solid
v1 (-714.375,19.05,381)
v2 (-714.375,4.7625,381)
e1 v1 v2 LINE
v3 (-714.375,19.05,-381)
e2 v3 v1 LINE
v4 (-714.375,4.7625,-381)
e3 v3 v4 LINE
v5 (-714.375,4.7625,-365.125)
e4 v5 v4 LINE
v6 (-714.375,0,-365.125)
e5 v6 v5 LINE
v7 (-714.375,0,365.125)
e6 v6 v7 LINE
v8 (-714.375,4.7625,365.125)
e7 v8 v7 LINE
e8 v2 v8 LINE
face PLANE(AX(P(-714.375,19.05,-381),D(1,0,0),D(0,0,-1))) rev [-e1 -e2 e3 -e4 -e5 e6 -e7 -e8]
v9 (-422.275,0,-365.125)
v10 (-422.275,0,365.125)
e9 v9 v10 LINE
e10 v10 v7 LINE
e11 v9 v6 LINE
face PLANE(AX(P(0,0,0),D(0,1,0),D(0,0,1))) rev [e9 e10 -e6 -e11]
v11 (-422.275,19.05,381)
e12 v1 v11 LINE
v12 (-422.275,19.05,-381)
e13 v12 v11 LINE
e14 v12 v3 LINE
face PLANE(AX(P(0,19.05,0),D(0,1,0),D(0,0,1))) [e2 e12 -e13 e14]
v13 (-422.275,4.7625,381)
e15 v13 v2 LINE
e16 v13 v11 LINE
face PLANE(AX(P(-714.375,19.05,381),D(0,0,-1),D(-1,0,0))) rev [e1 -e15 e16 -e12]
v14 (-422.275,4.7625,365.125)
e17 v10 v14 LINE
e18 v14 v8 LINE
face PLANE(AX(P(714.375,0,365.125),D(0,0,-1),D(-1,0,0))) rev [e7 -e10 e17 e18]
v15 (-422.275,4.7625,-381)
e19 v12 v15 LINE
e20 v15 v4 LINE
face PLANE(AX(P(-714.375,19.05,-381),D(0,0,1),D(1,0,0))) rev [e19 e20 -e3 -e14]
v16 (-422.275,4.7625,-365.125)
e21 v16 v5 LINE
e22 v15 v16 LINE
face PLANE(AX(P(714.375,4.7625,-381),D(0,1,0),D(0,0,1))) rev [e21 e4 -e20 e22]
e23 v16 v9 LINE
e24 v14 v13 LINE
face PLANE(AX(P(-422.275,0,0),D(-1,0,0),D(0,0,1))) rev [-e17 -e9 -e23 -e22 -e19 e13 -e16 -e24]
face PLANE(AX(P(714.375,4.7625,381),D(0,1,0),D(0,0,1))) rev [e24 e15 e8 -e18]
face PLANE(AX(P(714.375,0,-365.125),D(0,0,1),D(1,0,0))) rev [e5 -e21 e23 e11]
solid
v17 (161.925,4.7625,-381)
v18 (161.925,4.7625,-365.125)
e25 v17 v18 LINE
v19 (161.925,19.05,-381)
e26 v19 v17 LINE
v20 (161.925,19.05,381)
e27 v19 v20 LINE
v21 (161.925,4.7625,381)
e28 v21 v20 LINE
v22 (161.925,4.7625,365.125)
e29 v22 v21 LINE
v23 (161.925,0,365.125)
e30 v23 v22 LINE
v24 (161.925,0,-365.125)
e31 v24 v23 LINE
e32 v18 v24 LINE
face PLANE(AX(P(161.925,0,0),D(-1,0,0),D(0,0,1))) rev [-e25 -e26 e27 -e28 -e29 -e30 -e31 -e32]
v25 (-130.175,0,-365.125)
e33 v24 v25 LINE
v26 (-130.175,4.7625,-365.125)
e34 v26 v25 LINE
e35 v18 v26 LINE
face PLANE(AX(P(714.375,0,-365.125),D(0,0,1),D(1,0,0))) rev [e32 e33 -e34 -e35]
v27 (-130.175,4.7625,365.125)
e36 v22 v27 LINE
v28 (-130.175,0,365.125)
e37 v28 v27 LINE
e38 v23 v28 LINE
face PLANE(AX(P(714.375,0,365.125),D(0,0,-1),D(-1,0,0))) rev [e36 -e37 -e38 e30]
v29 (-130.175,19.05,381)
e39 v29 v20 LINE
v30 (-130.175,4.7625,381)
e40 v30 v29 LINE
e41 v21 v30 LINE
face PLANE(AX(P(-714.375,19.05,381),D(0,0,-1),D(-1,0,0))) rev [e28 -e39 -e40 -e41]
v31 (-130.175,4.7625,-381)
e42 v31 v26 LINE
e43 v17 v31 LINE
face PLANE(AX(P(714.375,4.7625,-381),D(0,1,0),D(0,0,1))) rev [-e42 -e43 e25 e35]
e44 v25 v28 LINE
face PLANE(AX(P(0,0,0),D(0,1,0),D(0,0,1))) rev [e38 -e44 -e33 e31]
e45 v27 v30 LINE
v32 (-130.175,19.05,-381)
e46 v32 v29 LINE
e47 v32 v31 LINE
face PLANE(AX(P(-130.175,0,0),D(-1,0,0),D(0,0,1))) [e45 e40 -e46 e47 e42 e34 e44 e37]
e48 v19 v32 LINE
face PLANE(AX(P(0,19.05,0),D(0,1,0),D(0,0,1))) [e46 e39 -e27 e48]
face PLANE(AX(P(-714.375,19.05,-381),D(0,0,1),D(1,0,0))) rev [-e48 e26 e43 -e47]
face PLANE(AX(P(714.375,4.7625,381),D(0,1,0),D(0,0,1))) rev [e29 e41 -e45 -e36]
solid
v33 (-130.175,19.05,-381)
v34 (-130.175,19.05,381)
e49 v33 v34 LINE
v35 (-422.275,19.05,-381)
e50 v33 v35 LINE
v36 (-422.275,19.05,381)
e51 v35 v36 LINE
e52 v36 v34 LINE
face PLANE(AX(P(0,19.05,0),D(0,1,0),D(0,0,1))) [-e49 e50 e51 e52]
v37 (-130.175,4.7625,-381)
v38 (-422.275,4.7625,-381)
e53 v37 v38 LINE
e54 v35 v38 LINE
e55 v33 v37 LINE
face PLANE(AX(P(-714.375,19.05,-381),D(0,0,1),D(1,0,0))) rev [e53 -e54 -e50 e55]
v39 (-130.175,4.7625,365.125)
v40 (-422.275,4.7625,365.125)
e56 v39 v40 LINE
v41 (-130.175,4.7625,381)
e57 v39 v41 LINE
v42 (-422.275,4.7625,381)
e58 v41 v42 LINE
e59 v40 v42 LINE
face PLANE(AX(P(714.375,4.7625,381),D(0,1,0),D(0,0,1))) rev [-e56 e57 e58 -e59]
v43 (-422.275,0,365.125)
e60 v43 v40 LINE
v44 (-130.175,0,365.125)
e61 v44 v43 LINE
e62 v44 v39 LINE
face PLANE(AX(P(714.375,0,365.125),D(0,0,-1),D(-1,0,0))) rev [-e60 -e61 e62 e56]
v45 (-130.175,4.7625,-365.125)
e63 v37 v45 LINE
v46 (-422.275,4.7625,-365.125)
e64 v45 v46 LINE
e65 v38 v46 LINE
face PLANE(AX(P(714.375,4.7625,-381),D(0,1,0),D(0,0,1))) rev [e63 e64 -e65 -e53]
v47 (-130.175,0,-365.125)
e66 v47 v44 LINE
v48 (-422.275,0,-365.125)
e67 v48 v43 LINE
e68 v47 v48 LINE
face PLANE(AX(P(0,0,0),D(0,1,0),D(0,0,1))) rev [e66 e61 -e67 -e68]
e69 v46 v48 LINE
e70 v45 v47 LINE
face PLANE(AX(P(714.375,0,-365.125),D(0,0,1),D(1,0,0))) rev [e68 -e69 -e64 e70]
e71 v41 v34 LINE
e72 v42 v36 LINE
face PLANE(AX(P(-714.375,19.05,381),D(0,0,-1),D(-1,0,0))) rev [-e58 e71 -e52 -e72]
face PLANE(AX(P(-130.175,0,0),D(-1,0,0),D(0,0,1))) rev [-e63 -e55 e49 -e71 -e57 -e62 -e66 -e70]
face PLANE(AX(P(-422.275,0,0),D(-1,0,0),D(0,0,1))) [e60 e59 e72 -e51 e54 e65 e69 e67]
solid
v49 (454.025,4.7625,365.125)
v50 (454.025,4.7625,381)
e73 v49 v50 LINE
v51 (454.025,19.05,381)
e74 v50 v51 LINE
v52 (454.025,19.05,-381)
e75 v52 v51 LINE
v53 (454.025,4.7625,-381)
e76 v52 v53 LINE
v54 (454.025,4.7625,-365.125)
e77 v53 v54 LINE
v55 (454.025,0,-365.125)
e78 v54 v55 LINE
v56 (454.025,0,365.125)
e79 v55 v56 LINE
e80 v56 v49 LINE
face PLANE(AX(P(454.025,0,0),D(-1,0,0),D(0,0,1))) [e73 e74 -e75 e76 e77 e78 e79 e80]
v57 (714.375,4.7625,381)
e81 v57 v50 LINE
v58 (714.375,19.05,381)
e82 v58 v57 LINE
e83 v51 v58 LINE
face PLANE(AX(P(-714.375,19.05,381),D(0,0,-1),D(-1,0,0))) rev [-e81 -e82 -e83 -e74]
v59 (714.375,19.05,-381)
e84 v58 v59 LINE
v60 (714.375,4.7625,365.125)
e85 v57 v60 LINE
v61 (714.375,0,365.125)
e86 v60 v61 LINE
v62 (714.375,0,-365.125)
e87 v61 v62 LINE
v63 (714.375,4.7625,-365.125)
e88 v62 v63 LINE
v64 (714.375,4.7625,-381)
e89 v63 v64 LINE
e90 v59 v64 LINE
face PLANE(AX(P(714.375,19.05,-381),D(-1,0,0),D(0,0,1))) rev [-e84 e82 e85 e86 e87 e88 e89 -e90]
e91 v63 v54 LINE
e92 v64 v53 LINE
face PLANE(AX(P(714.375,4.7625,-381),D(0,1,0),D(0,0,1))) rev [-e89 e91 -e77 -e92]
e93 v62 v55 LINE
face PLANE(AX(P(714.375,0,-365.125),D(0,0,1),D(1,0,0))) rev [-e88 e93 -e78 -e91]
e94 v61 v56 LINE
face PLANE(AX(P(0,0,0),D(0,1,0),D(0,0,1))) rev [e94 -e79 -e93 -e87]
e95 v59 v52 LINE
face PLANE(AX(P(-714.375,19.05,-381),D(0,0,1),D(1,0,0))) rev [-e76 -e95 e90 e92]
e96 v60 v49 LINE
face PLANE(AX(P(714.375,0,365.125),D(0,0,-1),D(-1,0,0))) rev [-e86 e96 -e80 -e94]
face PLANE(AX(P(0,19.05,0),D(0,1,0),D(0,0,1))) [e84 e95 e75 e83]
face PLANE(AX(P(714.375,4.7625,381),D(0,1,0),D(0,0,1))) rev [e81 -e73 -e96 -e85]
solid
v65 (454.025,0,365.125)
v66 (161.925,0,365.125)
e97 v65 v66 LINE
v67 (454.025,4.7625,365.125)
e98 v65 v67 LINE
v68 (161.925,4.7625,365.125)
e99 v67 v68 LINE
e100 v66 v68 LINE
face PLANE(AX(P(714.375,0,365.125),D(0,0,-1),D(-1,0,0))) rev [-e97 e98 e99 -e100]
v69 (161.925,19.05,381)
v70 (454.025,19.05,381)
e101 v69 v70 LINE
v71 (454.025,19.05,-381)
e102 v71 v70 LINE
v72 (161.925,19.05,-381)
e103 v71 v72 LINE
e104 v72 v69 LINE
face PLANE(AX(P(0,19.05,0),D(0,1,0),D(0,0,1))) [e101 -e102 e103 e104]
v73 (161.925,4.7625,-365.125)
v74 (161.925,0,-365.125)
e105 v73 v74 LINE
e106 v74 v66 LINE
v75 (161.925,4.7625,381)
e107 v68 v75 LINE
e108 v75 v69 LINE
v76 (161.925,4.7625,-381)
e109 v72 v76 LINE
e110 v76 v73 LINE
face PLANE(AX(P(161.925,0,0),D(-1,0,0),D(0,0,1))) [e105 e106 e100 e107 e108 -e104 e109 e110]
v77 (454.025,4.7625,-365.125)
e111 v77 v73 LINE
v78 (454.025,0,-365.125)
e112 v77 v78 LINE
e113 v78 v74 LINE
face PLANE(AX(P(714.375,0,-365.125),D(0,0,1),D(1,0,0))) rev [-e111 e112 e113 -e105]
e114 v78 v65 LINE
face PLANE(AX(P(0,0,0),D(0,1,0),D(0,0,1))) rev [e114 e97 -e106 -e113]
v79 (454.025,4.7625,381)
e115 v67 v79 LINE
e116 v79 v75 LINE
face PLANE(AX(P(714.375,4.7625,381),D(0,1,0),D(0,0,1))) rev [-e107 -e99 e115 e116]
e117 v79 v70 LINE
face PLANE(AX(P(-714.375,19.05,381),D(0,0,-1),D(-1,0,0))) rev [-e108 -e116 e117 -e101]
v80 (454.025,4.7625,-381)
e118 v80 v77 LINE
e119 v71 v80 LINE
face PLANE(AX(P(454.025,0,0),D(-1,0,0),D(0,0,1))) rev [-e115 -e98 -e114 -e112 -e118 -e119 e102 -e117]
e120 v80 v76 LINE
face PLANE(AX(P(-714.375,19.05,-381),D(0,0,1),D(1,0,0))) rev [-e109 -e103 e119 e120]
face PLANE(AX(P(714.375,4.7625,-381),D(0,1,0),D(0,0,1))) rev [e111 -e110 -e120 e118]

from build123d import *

# Parameters (mm, degrees)
SKETCH1_W           = 1428.75
SKETCH1_H           = 762
BOSS_EXTRUDE1_DEPTH = 19.05
SKETCH3_W           = 15.875
SKETCH3_H           = 4.7625
CUT_EXTRUDE1_DEPTH  = 1479.800346565
SPLIT1_START        = 454.025
SPLIT1_DEPTH        = 260.35
SPLIT1_START_2      = -714.375
SPLIT1_2_DEPTH      = 292.1
SPLIT1_START_3      = -422.275
SPLIT1_3_DEPTH      = 292.1
SPLIT1_4_DEPTH      = 584.2
SPLIT1_START_4      = 161.925
SPLIT1_5_DEPTH      = 552.45
SPLIT1_6_DEPTH      = 292.1


# Read off the part's stored shape, not the designer's step: Split1
with BuildPart() as part:
    # Sketch1 → Boss-Extrude1 (new body)
    with BuildSketch(Plane(origin=(0, 0, 0), x_dir=(1, 0, 0), z_dir=(0, 1, 0))):
        Rectangle(SKETCH1_W, SKETCH1_H)
    extrude(amount=BOSS_EXTRUDE1_DEPTH)

    # Sketch3 → Cut-Extrude1 (cut, through all)
    with BuildSketch(Plane.ZY.offset(714.375)):
        with Locations((-373.0625, 2.38125)):
            Rectangle(SKETCH3_W, SKETCH3_H)
        with Locations((373.0625, 2.38125)):
            Rectangle(SKETCH3_W, SKETCH3_H)
    extrude(amount=-CUT_EXTRUDE1_DEPTH, mode=Mode.SUBTRACT)

    # Split1 4 outline → Split1 4 (cut)
    with BuildSketch(Plane.YZ.offset(SPLIT1_START_2)):
        Polygon((4.7625, -381), (19.05, -381), (19.05, 381), (4.7625, 381), (4.7625, 365.125), (0, 365.125), (0, -365.125), (4.7625, -365.125), align=None)
    extrude(amount=SPLIT1_4_DEPTH, mode=Mode.SUBTRACT)

    # Split1 5 outline → Split1 5 (cut)
    with BuildSketch(Plane.YZ.offset(SPLIT1_START_4)):
        Polygon((4.7625, -381), (19.05, -381), (19.05, 381), (4.7625, 381), (4.7625, 365.125), (0, 365.125), (0, -365.125), (4.7625, -365.125), align=None)
    extrude(amount=SPLIT1_5_DEPTH, mode=Mode.SUBTRACT)


with BuildPart() as body_2:
    # Split1 outline → Split1 (new body)
    with BuildSketch(Plane.YZ.offset(SPLIT1_START)):
        Polygon((19.05, 381), (4.7625, 381), (4.7625, 365.125), (0, 365.125), (0, -365.125), (4.7625, -365.125), (4.7625, -381), (19.05, -381), align=None)
    extrude(amount=SPLIT1_DEPTH)


with BuildPart() as body_3:
    # Split1 2 outline → Split1 2 (new body)
    with BuildSketch(Plane.YZ.offset(SPLIT1_START_2)):
        Polygon((4.7625, -381), (19.05, -381), (19.05, 381), (4.7625, 381), (4.7625, 365.125), (0, 365.125), (0, -365.125), (4.7625, -365.125), align=None)
    extrude(amount=SPLIT1_2_DEPTH)


with BuildPart() as body_4:
    # Split1 3 outline → Split1 3 (new body)
    with BuildSketch(Plane.YZ.offset(SPLIT1_START_3)):
        Polygon((4.7625, -381), (19.05, -381), (19.05, 381), (4.7625, 381), (4.7625, 365.125), (0, 365.125), (0, -365.125), (4.7625, -365.125), align=None)
    extrude(amount=SPLIT1_3_DEPTH)


with BuildPart() as body_5:
    # Split1 6 outline → Split1 6 (new body)
    with BuildSketch(Plane.YZ.offset(SPLIT1_START_4)):
        Polygon((4.7625, -381), (19.05, -381), (19.05, 381), (4.7625, 381), (4.7625, 365.125), (0, 365.125), (0, -365.125), (4.7625, -365.125), align=None)
    extrude(amount=SPLIT1_6_DEPTH)


solid = Compound([part.part, body_2.part, body_3.part, body_4.part, body_5.part])
